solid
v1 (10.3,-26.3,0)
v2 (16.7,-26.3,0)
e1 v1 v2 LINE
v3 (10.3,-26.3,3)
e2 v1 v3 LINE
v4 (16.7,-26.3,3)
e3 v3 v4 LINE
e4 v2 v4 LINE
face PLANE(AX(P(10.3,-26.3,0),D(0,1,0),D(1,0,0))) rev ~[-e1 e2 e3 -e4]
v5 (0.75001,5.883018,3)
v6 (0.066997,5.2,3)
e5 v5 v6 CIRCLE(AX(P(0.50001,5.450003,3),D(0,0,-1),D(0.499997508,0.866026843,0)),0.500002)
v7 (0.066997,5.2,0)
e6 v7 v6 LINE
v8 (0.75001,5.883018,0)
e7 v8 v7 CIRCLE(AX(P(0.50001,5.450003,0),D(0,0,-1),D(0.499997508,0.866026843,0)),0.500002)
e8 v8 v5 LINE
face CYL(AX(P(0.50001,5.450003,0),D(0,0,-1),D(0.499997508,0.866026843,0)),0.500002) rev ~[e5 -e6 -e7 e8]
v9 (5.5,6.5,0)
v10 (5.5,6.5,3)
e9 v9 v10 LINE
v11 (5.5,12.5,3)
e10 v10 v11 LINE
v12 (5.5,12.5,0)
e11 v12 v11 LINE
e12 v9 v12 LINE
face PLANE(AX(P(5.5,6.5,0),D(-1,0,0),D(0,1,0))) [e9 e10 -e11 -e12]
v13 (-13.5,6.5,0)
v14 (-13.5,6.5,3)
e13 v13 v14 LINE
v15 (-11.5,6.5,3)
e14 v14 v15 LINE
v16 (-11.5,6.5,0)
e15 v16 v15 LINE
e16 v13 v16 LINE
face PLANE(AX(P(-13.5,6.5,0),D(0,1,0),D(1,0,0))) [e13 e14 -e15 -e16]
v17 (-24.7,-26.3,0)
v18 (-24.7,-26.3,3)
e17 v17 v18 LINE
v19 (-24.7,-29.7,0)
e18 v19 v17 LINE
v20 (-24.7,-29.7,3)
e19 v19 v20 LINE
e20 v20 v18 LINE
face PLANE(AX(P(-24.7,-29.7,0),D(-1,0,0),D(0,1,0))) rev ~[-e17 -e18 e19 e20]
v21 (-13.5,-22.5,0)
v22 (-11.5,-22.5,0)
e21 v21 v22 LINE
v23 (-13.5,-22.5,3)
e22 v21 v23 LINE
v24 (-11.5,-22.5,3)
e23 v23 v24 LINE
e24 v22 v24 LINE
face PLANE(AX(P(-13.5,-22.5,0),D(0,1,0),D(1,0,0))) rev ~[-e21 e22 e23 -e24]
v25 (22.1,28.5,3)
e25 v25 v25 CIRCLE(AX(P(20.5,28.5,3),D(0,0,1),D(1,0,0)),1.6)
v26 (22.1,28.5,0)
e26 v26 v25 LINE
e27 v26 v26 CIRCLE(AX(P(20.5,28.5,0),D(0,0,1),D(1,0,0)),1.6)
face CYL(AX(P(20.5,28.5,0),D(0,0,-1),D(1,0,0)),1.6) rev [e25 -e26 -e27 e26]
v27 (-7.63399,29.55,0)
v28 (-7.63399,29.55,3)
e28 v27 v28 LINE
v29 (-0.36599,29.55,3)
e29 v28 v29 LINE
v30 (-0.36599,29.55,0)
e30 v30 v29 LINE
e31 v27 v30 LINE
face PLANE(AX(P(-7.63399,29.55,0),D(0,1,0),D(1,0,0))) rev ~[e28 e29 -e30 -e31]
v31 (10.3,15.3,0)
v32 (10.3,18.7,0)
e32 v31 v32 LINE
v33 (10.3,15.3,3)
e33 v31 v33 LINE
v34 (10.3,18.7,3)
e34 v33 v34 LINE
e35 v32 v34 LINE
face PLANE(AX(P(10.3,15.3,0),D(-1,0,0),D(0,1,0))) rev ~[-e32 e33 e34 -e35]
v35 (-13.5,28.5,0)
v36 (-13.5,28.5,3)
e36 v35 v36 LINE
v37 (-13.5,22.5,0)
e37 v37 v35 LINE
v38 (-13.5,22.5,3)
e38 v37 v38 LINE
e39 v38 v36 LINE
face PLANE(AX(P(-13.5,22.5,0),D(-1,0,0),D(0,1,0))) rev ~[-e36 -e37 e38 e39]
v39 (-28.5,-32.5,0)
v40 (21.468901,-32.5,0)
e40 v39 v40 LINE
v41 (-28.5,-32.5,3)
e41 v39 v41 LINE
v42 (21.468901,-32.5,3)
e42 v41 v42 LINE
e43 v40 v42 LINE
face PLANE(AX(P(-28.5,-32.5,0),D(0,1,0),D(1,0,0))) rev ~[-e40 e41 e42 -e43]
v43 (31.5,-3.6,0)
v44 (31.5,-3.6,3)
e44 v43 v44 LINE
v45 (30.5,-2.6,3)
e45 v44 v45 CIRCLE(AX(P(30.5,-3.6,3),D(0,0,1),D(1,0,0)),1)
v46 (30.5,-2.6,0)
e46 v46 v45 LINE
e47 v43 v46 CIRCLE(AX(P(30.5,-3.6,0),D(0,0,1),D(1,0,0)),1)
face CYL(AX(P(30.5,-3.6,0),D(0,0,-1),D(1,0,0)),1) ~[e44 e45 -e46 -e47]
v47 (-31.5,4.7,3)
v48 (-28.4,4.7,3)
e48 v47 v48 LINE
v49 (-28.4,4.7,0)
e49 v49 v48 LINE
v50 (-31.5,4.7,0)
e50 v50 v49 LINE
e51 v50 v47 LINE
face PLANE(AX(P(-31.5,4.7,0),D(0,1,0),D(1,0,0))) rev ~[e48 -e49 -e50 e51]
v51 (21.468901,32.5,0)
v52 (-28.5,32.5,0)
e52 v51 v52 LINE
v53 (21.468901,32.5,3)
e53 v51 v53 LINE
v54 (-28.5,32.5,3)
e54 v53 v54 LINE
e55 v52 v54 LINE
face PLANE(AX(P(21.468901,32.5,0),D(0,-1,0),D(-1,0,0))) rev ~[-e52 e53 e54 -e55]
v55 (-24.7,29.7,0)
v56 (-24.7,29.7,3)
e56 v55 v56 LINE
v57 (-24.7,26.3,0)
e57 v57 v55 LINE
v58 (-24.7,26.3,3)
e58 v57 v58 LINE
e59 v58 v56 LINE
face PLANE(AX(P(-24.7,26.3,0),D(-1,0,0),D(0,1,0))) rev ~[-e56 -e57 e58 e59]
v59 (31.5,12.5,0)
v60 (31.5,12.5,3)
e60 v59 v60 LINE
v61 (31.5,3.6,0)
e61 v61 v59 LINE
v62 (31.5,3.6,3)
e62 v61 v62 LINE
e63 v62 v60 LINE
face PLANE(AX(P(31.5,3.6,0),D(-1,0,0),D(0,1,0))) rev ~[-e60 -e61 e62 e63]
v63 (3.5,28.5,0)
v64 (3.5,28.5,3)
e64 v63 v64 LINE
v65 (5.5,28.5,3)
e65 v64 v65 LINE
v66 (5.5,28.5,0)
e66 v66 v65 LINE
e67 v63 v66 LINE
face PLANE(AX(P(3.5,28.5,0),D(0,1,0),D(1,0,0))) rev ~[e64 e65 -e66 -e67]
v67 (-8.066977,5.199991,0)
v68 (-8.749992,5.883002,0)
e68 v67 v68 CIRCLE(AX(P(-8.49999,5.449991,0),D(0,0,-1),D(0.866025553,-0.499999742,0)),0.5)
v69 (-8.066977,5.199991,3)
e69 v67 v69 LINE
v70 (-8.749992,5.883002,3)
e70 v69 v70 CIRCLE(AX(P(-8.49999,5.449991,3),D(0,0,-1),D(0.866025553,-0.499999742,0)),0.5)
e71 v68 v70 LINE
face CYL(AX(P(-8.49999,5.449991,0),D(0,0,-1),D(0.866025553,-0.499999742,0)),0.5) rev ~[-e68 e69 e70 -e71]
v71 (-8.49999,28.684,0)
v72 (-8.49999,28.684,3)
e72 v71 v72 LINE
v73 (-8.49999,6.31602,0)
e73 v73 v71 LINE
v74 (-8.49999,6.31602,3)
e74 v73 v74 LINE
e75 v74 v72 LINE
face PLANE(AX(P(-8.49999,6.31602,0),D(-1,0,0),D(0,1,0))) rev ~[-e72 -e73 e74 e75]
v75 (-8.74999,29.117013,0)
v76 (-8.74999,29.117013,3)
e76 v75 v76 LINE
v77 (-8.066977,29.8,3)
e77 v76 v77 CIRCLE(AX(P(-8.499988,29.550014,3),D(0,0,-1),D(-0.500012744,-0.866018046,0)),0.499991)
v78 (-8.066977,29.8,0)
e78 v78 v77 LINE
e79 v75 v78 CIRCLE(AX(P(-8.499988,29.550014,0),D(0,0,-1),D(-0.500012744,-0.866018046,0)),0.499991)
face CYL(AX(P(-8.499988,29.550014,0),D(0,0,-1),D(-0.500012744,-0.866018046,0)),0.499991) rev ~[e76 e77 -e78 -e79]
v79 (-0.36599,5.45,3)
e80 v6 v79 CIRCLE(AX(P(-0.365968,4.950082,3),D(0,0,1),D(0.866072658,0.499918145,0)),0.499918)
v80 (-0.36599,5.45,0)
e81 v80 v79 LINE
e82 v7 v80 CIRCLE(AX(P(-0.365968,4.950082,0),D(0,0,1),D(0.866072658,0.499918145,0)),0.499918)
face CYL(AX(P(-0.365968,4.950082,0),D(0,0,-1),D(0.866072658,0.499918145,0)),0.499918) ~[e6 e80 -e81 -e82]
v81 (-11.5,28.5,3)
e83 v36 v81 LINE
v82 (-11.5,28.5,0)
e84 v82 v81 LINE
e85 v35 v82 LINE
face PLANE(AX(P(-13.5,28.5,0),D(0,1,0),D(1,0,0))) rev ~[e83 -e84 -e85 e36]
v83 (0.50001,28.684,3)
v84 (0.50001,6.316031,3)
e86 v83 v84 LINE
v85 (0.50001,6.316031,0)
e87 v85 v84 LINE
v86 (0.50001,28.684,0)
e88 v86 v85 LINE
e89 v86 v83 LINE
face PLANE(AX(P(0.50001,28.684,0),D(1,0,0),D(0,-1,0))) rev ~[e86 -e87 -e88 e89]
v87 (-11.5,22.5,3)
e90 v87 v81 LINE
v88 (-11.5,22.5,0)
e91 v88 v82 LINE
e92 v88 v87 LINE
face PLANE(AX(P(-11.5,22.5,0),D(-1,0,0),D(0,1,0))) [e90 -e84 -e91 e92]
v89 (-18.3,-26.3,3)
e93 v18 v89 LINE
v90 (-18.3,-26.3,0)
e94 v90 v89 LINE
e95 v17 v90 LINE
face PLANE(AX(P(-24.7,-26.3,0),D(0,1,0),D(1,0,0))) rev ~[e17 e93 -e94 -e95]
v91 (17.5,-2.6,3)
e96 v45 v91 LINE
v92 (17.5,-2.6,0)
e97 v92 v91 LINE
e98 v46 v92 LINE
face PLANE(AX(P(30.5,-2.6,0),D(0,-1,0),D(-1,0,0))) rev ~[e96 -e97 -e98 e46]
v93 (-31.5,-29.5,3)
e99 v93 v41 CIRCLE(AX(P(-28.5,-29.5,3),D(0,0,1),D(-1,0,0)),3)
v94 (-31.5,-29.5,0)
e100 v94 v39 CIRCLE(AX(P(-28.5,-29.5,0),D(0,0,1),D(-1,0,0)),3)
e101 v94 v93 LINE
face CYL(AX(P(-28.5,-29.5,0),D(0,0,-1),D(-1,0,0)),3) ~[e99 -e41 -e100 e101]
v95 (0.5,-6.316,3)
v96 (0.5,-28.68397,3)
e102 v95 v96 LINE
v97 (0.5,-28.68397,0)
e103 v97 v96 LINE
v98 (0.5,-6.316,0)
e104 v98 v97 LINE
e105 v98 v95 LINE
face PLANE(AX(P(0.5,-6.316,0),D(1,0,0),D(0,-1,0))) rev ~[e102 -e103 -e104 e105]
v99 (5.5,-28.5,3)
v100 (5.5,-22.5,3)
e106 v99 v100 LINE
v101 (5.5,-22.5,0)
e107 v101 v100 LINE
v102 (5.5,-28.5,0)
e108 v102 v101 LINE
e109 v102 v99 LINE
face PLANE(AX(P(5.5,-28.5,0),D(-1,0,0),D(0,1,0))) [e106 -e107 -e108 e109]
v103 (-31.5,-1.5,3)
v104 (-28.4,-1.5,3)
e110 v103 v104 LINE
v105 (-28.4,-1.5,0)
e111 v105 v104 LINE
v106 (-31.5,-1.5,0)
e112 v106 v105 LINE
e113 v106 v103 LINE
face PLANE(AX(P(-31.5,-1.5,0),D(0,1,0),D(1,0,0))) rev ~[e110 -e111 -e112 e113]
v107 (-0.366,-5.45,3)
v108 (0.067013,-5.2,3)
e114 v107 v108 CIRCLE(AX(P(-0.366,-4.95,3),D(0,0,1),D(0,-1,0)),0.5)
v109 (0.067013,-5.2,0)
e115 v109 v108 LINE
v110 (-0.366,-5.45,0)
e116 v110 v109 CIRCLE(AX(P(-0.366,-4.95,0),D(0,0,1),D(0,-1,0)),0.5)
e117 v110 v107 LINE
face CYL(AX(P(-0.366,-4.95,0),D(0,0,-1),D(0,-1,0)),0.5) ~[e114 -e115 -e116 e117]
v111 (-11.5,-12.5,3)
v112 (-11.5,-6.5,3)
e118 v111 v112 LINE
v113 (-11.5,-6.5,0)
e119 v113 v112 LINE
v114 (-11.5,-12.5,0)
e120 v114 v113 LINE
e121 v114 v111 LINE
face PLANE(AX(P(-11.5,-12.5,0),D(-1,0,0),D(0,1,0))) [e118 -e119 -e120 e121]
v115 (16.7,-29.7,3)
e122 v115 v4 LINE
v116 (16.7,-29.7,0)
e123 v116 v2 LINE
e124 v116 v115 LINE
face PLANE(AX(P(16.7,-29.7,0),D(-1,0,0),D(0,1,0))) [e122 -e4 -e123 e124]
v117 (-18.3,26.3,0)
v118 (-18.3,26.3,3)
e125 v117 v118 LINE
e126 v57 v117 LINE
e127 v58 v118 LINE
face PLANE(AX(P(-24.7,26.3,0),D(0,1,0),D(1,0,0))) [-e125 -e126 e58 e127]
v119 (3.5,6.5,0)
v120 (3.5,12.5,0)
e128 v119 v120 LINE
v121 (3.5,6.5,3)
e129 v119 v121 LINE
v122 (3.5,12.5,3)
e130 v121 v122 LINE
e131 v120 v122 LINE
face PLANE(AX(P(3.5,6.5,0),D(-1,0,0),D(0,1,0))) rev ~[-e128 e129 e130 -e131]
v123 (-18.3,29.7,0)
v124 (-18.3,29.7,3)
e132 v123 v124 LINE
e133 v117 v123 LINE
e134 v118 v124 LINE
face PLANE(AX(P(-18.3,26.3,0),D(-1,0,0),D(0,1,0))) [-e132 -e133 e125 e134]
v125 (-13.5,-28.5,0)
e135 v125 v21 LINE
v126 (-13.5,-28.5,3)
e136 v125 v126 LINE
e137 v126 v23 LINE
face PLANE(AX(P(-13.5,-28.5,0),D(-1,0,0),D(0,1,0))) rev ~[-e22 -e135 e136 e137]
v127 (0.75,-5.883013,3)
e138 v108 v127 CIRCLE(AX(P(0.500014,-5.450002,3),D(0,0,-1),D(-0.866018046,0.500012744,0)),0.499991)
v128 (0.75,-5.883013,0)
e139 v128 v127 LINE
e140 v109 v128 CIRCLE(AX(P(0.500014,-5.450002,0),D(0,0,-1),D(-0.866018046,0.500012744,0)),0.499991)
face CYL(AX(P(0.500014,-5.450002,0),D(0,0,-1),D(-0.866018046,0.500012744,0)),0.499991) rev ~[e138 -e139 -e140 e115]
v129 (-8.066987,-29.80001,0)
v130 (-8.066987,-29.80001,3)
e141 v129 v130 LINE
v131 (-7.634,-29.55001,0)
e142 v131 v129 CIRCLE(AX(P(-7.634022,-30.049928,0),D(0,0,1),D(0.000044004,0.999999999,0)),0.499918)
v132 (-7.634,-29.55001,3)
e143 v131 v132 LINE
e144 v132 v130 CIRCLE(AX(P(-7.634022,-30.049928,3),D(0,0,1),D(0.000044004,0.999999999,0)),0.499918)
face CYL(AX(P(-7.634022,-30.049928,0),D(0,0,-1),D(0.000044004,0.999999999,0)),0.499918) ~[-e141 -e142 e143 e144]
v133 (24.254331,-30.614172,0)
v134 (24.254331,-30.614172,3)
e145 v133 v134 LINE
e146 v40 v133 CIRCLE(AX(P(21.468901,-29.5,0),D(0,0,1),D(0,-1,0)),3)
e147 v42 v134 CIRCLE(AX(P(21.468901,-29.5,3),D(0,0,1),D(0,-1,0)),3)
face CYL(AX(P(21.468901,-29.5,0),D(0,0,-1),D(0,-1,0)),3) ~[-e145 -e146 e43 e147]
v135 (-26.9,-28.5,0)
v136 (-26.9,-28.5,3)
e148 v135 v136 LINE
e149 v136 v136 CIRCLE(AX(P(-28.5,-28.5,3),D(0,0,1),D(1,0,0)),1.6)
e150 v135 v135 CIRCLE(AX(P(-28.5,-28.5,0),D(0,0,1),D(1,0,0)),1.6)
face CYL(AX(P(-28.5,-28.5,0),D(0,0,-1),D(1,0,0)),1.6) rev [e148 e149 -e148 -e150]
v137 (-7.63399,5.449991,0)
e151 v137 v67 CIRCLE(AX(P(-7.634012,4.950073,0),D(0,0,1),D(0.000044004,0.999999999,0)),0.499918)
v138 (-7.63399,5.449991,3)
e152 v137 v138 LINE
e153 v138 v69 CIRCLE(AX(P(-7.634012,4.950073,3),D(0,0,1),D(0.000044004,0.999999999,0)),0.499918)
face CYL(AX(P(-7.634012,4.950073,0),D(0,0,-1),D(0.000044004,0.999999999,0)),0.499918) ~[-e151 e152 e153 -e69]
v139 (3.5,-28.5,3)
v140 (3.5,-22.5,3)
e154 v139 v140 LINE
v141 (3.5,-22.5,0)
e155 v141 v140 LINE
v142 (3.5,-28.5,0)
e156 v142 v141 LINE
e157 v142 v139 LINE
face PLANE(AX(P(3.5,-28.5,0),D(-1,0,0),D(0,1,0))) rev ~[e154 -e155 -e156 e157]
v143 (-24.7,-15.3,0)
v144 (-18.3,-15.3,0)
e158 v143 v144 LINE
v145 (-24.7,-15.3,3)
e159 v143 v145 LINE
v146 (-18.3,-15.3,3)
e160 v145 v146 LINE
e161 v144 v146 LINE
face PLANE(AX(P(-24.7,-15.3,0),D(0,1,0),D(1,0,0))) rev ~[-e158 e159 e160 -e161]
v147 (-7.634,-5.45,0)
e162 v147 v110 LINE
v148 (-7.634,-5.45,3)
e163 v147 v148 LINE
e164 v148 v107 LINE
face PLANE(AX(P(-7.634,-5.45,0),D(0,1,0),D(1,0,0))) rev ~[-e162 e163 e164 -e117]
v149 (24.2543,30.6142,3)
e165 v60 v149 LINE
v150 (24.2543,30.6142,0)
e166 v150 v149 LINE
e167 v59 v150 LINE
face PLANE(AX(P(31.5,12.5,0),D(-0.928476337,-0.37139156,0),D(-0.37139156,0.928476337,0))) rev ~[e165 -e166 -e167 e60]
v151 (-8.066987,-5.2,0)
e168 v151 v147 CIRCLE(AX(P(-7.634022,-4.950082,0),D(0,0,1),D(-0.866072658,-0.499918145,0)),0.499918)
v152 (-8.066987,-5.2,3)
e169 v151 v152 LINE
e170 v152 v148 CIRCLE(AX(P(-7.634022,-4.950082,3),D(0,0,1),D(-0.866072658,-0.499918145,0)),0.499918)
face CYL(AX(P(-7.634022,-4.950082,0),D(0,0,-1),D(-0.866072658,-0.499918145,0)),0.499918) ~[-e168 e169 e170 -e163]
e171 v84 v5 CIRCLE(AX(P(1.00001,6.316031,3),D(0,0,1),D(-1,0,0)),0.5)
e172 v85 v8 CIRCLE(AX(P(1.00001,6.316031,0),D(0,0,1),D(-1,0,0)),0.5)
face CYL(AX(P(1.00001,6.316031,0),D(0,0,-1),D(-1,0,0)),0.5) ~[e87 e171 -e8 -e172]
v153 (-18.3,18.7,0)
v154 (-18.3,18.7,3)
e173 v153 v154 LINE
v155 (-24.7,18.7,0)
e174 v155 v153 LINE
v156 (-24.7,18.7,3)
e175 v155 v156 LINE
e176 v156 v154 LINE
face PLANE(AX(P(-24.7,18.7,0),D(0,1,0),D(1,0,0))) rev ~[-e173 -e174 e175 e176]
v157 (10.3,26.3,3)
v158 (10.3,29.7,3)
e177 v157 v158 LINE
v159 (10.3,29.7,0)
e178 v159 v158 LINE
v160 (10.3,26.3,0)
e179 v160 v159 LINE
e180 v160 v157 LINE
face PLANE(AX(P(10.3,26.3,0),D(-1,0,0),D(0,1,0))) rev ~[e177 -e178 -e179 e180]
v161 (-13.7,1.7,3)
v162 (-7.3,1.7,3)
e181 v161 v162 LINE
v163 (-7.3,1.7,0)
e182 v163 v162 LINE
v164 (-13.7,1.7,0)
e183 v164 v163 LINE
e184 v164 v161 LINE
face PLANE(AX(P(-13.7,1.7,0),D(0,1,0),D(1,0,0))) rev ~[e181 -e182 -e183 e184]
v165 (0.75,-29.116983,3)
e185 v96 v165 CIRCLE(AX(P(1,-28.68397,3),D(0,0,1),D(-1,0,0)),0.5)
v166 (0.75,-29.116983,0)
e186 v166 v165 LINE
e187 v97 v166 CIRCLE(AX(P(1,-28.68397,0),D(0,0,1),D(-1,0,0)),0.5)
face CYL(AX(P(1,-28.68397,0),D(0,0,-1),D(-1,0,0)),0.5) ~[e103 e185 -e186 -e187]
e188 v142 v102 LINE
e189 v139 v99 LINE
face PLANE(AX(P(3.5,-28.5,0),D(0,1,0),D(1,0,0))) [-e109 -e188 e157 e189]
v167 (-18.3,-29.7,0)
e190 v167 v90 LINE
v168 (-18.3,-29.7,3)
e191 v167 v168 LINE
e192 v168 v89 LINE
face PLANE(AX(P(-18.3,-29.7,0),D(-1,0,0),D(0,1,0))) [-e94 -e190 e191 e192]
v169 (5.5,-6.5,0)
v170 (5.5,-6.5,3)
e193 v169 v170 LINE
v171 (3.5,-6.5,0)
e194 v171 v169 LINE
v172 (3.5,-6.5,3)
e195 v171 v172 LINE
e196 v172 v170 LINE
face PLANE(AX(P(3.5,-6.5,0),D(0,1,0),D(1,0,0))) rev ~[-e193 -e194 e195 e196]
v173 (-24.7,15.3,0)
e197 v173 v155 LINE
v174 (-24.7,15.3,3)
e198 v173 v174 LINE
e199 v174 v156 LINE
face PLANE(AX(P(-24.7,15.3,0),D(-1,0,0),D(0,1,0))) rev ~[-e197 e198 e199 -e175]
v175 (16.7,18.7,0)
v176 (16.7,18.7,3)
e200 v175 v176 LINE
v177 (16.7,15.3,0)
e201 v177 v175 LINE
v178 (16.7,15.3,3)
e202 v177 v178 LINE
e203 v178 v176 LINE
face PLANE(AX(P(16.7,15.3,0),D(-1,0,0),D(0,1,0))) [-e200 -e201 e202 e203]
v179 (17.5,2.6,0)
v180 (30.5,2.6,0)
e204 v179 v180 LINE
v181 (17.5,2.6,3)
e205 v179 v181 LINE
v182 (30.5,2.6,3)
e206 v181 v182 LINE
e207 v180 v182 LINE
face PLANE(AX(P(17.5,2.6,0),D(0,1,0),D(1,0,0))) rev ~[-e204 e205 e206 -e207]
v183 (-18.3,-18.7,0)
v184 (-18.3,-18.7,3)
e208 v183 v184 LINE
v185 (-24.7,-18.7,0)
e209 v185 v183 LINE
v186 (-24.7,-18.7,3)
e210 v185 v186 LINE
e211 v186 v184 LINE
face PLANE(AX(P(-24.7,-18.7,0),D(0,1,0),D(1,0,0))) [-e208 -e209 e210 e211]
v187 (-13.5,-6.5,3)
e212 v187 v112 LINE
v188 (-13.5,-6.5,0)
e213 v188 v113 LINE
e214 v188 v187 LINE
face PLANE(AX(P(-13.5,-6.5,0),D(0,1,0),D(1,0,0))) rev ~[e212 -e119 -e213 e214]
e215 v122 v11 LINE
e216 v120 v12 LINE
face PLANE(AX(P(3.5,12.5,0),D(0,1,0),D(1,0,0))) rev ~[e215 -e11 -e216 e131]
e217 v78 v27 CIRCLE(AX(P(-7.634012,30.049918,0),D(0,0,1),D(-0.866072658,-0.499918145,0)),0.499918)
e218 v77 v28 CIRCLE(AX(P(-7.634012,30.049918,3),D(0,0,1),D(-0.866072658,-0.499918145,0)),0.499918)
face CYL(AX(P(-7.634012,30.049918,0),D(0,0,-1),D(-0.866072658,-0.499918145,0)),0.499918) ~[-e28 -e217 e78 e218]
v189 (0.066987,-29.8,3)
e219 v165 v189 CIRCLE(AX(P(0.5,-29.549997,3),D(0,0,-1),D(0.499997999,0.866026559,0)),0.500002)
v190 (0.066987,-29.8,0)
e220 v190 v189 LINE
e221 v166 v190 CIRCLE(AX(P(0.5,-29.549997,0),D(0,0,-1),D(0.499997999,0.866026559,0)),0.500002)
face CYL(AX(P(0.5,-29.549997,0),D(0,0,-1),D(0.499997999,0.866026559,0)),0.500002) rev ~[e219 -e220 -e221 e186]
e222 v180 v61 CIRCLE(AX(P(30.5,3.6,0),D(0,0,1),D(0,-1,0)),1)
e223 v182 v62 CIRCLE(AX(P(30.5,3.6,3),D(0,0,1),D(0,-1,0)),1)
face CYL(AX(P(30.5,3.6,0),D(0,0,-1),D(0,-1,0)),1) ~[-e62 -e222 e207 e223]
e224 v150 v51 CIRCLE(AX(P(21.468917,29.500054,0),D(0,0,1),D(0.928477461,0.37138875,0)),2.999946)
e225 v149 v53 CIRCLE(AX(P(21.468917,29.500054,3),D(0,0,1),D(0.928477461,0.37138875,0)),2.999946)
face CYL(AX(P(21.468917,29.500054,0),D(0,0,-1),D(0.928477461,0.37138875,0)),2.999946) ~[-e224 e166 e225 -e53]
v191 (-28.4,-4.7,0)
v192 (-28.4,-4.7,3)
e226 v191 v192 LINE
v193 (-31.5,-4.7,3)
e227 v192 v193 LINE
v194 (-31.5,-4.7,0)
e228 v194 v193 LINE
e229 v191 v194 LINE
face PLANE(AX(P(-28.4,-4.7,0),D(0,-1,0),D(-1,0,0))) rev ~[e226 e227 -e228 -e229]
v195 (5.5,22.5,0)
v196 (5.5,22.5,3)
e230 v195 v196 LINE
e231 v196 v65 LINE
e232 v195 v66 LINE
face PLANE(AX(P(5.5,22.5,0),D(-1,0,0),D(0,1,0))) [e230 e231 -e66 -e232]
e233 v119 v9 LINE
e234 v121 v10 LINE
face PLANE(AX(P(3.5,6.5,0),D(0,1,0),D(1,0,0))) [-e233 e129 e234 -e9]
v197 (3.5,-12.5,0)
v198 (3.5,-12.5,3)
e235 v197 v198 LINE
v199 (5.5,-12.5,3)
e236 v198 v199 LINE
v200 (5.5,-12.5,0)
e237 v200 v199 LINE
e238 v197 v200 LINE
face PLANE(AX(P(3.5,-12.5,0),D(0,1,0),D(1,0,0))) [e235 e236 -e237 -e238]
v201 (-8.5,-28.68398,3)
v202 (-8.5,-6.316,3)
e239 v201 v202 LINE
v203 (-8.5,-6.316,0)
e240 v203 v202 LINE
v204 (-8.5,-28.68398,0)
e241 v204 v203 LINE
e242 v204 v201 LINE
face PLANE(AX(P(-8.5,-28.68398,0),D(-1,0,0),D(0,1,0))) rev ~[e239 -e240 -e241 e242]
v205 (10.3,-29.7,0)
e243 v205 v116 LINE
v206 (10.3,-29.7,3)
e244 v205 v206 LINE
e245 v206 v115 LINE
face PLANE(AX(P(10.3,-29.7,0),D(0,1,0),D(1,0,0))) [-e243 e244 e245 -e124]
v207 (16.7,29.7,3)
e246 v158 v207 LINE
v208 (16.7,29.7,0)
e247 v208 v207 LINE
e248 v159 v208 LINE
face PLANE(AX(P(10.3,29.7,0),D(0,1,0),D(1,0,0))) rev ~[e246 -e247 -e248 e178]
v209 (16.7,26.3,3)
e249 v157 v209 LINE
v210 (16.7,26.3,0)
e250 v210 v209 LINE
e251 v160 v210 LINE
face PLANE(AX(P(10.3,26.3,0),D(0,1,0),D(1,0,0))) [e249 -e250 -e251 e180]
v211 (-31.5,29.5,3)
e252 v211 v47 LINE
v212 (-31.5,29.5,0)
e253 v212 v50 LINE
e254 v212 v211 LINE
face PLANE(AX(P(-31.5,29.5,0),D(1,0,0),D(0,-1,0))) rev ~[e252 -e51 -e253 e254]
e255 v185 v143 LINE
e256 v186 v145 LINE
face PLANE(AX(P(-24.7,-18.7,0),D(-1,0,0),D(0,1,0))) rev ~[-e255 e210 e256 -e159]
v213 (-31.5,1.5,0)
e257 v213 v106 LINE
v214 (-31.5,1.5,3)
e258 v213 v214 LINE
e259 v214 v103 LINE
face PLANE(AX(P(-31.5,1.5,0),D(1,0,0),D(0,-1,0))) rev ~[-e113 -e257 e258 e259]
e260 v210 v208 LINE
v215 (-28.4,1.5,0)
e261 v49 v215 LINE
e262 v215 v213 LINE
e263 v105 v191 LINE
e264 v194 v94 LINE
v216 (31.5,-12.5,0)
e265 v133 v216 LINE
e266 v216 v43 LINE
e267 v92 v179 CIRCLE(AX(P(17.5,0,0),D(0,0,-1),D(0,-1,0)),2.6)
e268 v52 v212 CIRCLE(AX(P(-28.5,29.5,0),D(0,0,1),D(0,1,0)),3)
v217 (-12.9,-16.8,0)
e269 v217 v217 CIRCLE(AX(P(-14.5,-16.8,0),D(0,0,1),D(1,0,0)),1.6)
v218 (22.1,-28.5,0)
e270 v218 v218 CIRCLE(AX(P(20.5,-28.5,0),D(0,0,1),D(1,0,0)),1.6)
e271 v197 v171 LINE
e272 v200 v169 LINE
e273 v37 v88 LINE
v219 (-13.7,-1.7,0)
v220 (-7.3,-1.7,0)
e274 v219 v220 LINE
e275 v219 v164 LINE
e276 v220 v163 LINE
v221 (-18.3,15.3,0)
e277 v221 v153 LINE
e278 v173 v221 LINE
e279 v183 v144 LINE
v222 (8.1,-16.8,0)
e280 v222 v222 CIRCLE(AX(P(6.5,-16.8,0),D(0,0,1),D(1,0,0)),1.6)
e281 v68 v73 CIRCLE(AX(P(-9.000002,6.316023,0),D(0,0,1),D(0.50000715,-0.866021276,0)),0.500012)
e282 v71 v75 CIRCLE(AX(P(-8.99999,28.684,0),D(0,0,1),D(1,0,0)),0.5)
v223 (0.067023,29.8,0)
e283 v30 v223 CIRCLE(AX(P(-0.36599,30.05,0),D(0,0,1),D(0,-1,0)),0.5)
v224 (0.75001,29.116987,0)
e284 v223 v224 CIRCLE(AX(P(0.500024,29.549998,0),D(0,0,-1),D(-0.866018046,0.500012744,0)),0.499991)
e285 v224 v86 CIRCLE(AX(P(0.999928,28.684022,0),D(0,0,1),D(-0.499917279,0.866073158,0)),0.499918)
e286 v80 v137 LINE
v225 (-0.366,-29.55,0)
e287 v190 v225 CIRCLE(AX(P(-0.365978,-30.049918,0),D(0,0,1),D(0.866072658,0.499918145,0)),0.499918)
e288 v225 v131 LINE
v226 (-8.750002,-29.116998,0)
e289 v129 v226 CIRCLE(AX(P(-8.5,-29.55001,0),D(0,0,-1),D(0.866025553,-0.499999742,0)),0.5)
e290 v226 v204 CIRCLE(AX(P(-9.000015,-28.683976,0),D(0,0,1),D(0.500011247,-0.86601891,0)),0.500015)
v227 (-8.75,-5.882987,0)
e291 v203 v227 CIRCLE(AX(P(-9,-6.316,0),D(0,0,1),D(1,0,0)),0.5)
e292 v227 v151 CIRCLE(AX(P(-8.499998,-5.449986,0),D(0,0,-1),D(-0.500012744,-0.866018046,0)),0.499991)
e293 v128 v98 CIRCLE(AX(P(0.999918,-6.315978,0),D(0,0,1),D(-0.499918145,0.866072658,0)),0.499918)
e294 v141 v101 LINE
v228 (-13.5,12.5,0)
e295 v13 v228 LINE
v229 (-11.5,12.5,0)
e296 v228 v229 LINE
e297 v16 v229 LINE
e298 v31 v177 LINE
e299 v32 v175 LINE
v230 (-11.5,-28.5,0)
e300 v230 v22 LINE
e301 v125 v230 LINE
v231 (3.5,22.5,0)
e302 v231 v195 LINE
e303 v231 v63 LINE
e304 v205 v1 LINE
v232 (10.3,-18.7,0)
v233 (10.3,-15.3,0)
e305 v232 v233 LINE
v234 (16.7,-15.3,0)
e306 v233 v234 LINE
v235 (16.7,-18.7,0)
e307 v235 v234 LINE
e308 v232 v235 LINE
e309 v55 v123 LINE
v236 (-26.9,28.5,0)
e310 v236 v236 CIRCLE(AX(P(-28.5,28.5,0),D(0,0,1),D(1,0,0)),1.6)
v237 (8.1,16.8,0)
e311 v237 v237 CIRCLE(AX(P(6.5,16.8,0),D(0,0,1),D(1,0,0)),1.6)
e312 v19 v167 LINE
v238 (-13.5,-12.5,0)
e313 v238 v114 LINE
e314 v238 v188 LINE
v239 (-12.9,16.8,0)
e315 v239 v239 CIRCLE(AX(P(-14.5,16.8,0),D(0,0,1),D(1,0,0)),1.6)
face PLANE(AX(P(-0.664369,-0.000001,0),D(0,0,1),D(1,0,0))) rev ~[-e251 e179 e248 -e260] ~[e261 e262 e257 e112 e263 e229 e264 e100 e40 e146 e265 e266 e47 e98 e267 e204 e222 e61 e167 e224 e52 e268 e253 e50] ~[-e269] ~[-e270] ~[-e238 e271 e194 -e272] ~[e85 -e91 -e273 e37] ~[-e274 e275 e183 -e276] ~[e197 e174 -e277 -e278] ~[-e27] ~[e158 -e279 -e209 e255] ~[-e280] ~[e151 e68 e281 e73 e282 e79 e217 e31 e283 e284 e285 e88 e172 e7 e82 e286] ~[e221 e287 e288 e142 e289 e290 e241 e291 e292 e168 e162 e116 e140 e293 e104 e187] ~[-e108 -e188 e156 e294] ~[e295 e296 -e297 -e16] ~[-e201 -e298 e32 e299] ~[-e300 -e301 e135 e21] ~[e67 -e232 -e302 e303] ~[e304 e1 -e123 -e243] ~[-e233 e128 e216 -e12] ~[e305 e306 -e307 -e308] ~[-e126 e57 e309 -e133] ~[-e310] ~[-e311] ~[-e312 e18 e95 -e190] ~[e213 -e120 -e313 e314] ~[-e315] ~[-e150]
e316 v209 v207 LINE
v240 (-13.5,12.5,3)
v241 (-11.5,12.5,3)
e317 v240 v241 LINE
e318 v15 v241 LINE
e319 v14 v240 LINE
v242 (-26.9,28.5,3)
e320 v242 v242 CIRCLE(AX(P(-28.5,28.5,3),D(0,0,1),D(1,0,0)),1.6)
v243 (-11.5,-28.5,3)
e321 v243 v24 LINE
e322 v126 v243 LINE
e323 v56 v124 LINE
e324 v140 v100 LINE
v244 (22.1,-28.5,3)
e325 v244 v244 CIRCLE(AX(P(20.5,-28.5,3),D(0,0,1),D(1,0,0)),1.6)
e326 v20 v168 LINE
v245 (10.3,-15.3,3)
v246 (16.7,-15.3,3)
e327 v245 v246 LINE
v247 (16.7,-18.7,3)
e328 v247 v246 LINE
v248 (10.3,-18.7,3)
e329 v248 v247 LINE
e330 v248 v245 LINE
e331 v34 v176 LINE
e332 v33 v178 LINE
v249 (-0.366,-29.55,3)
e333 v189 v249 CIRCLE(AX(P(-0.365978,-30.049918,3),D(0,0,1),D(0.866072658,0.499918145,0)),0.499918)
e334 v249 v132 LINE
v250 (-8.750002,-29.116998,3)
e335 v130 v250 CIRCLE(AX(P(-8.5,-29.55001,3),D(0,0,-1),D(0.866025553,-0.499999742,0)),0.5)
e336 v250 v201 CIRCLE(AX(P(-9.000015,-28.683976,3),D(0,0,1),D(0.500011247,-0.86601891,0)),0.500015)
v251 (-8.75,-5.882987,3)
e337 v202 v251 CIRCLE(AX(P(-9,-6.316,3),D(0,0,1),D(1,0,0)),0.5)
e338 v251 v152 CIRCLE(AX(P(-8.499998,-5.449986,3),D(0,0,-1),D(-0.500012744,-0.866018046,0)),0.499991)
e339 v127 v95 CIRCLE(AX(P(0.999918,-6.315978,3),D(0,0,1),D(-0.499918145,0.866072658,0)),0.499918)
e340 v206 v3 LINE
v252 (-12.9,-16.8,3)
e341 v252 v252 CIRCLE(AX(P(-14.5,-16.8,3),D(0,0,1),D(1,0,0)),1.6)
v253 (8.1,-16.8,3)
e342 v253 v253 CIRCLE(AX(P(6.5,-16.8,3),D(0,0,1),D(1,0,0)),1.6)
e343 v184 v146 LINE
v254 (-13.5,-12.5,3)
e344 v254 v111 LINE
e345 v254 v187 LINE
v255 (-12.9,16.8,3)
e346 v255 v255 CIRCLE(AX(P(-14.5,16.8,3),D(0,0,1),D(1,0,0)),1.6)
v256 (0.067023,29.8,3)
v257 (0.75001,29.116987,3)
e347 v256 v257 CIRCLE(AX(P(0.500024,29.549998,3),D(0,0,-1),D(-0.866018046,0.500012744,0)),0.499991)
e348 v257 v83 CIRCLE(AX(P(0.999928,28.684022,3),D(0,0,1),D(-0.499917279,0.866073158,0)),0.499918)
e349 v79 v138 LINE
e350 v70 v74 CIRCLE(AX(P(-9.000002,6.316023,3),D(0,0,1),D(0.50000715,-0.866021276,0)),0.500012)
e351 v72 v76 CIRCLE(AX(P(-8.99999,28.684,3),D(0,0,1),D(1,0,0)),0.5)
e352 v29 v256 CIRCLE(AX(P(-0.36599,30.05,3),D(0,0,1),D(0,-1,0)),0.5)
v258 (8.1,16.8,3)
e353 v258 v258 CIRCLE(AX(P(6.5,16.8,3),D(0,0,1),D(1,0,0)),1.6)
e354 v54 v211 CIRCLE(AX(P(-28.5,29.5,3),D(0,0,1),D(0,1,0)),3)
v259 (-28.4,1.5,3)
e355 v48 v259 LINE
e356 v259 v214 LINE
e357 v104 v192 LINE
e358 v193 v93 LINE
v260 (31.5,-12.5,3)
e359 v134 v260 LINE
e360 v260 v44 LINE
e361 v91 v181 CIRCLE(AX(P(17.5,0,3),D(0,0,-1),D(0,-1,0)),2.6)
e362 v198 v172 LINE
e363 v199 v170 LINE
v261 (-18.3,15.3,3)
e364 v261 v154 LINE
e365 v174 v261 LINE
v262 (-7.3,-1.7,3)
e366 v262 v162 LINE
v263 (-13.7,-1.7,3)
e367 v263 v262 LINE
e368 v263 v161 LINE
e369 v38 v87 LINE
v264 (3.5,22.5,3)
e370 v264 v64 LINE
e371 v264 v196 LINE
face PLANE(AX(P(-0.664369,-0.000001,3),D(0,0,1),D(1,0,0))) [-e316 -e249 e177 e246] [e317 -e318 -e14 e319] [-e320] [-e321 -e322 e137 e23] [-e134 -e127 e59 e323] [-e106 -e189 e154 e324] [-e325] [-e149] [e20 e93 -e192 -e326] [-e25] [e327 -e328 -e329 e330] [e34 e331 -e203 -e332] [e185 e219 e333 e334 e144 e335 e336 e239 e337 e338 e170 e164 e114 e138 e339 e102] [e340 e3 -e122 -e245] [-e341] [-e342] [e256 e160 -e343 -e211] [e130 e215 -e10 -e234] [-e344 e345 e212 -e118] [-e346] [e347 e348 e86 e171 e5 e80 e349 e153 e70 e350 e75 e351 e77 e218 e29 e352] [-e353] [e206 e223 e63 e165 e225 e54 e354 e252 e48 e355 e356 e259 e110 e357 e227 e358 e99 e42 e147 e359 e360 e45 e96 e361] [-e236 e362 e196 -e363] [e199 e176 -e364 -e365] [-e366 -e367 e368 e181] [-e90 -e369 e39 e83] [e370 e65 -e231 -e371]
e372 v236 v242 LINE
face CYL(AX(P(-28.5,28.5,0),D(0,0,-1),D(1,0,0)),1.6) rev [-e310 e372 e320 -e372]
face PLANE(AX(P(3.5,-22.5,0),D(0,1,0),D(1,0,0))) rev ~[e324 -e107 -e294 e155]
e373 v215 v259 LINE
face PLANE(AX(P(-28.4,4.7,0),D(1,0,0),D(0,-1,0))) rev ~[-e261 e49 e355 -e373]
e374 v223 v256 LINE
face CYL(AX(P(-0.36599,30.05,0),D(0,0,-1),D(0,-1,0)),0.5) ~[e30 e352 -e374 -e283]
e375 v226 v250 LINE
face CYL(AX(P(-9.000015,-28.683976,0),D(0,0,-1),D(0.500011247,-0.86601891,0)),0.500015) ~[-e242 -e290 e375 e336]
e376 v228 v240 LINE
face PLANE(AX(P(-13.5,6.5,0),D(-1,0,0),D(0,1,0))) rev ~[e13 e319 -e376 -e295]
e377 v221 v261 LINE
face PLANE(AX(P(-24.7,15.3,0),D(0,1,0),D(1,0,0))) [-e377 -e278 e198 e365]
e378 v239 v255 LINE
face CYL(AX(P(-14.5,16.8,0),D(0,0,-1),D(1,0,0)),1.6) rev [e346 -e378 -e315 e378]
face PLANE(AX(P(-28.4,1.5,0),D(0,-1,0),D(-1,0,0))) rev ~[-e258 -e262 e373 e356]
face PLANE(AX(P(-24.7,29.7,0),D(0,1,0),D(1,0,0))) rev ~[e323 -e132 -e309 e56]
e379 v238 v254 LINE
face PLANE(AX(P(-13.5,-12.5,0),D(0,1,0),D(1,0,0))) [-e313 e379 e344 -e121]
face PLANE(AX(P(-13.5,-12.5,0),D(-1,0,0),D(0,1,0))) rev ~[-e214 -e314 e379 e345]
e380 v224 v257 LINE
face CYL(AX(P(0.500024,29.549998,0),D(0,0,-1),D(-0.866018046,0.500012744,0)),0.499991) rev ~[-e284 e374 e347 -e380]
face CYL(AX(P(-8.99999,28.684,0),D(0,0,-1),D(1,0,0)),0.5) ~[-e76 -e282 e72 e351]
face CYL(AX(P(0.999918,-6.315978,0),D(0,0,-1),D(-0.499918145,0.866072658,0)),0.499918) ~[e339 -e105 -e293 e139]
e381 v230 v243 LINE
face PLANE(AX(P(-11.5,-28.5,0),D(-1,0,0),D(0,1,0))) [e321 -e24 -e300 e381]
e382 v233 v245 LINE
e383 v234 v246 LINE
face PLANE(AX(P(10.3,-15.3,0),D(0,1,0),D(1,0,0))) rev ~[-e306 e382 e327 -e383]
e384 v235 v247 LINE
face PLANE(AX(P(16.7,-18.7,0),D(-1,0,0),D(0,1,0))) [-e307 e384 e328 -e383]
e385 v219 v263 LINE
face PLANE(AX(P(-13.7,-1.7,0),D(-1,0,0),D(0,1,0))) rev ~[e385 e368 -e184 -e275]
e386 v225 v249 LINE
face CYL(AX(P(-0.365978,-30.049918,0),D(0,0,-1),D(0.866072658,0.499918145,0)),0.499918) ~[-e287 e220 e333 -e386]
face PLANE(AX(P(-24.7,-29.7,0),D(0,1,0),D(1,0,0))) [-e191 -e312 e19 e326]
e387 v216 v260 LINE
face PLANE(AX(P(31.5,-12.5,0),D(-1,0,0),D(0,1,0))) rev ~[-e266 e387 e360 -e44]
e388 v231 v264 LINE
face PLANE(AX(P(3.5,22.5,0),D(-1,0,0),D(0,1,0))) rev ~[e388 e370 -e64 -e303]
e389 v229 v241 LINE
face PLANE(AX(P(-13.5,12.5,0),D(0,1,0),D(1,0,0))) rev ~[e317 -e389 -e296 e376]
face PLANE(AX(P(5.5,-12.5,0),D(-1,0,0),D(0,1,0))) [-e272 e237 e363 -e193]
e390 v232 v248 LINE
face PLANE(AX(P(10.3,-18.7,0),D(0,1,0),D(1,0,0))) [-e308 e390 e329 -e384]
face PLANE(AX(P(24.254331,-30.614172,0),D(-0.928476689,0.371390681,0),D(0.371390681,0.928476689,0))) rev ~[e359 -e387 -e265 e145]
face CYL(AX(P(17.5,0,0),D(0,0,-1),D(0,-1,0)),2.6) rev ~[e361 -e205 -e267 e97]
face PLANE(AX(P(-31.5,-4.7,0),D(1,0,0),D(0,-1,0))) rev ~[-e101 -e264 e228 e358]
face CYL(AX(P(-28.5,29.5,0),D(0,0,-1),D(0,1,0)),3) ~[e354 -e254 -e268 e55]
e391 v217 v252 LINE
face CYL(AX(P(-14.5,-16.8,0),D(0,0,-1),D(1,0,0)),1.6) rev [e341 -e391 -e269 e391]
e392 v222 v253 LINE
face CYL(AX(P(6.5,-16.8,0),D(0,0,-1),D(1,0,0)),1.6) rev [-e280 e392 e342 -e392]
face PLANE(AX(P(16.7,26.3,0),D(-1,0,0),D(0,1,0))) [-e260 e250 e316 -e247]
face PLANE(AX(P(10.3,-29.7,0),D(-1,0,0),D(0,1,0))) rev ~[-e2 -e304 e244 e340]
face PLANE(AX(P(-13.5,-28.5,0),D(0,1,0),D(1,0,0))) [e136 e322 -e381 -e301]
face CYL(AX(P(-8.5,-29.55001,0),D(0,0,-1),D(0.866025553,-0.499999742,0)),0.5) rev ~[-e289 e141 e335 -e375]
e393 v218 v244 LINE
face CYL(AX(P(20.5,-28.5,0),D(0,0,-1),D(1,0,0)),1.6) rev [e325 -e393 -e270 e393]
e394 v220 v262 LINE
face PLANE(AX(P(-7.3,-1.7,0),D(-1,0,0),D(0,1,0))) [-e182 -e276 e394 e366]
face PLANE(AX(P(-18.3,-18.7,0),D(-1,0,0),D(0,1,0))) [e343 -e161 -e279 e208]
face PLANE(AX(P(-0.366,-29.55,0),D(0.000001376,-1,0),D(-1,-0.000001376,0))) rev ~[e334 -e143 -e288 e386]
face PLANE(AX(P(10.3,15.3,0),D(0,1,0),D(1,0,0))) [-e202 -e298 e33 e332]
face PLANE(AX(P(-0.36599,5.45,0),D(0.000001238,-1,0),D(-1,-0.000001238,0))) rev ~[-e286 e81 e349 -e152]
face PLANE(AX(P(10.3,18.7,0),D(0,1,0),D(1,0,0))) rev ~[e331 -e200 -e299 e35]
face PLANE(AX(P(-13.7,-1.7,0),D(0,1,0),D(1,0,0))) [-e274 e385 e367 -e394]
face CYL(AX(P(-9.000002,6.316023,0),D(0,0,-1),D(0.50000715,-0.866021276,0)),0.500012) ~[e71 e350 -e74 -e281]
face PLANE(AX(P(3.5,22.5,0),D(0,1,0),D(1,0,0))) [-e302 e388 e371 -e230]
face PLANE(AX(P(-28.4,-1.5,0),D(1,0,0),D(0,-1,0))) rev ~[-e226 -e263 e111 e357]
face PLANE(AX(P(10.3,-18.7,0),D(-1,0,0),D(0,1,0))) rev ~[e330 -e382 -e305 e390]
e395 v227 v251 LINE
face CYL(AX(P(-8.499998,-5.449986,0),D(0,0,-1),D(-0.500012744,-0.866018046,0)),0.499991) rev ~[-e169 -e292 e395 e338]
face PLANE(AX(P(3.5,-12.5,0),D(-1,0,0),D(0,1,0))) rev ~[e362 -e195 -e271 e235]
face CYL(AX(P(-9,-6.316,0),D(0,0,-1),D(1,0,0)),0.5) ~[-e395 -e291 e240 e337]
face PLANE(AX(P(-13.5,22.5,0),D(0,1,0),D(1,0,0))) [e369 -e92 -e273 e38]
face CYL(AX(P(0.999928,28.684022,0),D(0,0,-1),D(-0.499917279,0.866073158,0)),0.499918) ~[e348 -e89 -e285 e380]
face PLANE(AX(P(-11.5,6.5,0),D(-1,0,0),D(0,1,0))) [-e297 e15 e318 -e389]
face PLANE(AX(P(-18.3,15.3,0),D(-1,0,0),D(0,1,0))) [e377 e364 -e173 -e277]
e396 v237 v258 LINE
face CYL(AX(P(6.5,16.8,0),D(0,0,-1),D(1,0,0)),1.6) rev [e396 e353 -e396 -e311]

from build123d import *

# Parameters (mm, degrees)
F0_R     = 1.6
F0_W     = 6.4
F0_H     = 3.4
F0_W_2   = 2
F0_H_2   = 6
F1_DEPTH = 3


# Not quite as in the source:
# - ends of sketch curves that miss each other by under 0.0002 mm in the source are joined


with BuildPart() as f1:
    # F0 (on Top) → F1 (new body)
    with BuildSketch(Plane.XY):
        with BuildLine():
            Line((-31.5, 1.5), (-31.5, -1.5))
            Line((-31.5, -1.5), (-28.4, -1.5))
            Line((-28.4, -1.5), (-28.4, -4.7))
            Line((-28.4, -4.7), (-31.5, -4.7))
            Line((-31.5, -4.7), (-31.5, -29.5))
            ThreePointArc((-31.5, -29.5), (-30.6213203436, -31.6213203436), (-28.5, -32.5))
            Line((-28.5, -32.5), (21.468901, -32.5))
            ThreePointArc((21.468901, -32.5), (23.1507874279, -31.9842016914), (24.2543310727, -30.6141720291))
            Line((24.2543310727, -30.6141720291), (31.5, -12.5))
            Line((31.5, -12.5), (31.5, -3.6))
            ThreePointArc((31.5, -3.6), (31.2071067812, -2.8928932188), (30.5, -2.6))
            Line((30.5, -2.6), (17.5, -2.6))
            ThreePointArc((17.5, -2.6), (14.9, 0), (17.5, 2.6))
            Line((17.5, 2.6), (30.5, 2.6))
            ThreePointArc((30.5, 2.6), (31.2071067812, 2.8928932188), (31.5, 3.6))
            Line((31.5, 3.6), (31.5, 12.5))
            Line((31.5, 12.5), (24.2543, 30.6142))
            ThreePointArc((24.2543, 30.6142), (23.1507874279, 31.9842016914), (21.468901, 32.5))
            Line((21.468901, 32.5), (-28.5, 32.5))
            ThreePointArc((-28.5, 32.5), (-30.6213203436, 31.6213203436), (-31.5, 29.5))
            Line((-31.5, 29.5), (-31.5, 4.7))
            Line((-31.5, 4.7), (-28.4, 4.7))
            Line((-28.4, 4.7), (-28.4, 1.5))
            Line((-28.4, 1.5), (-31.5, 1.5))
        make_face()
        with Locations((-28.5, -28.5)):
            Circle(F0_R, mode=Mode.SUBTRACT)
        with Locations((-21.5, -28)):
            Rectangle(F0_W, F0_H, mode=Mode.SUBTRACT)
        with Locations((-21.5, -17)):
            Rectangle(F0_W, F0_H, mode=Mode.SUBTRACT)
        with Locations((-12.5, -25.5)):
            Rectangle(F0_W_2, F0_H_2, mode=Mode.SUBTRACT)
        with Locations((-14.5, -16.8)):
            Circle(F0_R, mode=Mode.SUBTRACT)
        with BuildLine():
            ThreePointArc((-8.0669872236, -29.8000098709), (-8.8535526014, -29.9035641797), (-8.7500018039, -29.1169983396))
            ThreePointArc((-8.7500018039, -29.1169983396), (-8.5669873354, -28.9339800645), (-8.5, -28.68398))
            Line((-8.5, -28.68398), (-8.5, -6.316))
            ThreePointArc((-8.5, -6.316), (-8.5669873354, -6.0659999355), (-8.7500001291, -5.8829872236))
            ThreePointArc((-8.7500001291, -5.8829872236), (-8.8535533906, -5.0964466094), (-8.0669872236, -5.2000001291))
            ThreePointArc((-8.0669872236, -5.2000001291), (-7.8840000645, -5.3830126646), (-7.634, -5.45))
            Line((-7.634, -5.45), (-0.366, -5.45))
            ThreePointArc((-0.366, -5.45), (-0.1159999355, -5.3830126646), (0.0670127764, -5.1999998709))
            ThreePointArc((0.0670127764, -5.1999998709), (0.8535541797, -5.0964473986), (0.7499998709, -5.8830127764))
            ThreePointArc((0.7499998709, -5.8830127764), (0.5669873354, -6.0659999355), (0.5, -6.316))
            Line((0.5, -6.316), (0.5, -28.68397))
            ThreePointArc((0.5, -28.68397), (0.5669873354, -28.9339700645), (0.7500001291, -29.1169827764))
            ThreePointArc((0.7500001291, -29.1169827764), (0.8535533906, -29.9035533906), (0.0669872236, -29.7999998709))
            ThreePointArc((0.0669872236, -29.7999998709), (-0.1159999355, -29.6169873354), (-0.366, -29.55))
            Line((-0.366, -29.55), (-7.634, -29.55001))
            ThreePointArc((-7.634, -29.55001), (-7.8840000645, -29.6169973354), (-8.0669872236, -29.8000098709))
        make_face(mode=Mode.SUBTRACT)
        with Locations((-12.5, -9.5)):
            Rectangle(F0_W_2, F0_H_2, mode=Mode.SUBTRACT)
        with Locations((4.5, -25.5)):
            Rectangle(F0_W_2, F0_H_2, mode=Mode.SUBTRACT)
        with Locations((13.5, -28)):
            Rectangle(F0_W, F0_H, mode=Mode.SUBTRACT)
        with Locations((6.5, -16.8)):
            Circle(F0_R, mode=Mode.SUBTRACT)
        with Locations((13.5, -17)):
            Rectangle(F0_W, F0_H, mode=Mode.SUBTRACT)
        with Locations((20.5, -28.5)):
            Circle(F0_R, mode=Mode.SUBTRACT)
        with Locations((4.5, -9.5)):
            Rectangle(F0_W_2, F0_H_2, mode=Mode.SUBTRACT)
        with Locations((-10.5, 0)):
            Rectangle(F0_W, F0_H, mode=Mode.SUBTRACT)
        with Locations((-12.5, 9.5)):
            Rectangle(F0_W_2, F0_H_2, mode=Mode.SUBTRACT)
        with Locations((-21.5, 17)):
            Rectangle(F0_W, F0_H, mode=Mode.SUBTRACT)
        with Locations((-28.5, 28.5)):
            Circle(F0_R, mode=Mode.SUBTRACT)
        with Locations((-21.5, 28)):
            Rectangle(F0_W, F0_H, mode=Mode.SUBTRACT)
        with Locations((-14.5, 16.8)):
            Circle(F0_R, mode=Mode.SUBTRACT)
        with BuildLine():
            ThreePointArc((-8.0669772236, 5.1999911291), (-8.8535424247, 5.0964366435), (-8.7499922369, 5.8830024104))
            ThreePointArc((-8.7499922369, 5.8830024104), (-8.5669772104, 6.066020152), (-8.49999, 6.31602))
            Line((-8.49999, 6.31602), (-8.49999, 28.684))
            ThreePointArc((-8.49999, 28.684), (-8.5669773354, 28.9340000645), (-8.7499901291, 29.1170127764))
            ThreePointArc((-8.7499901291, 29.1170127764), (-8.8535432138, 29.9035535674), (-8.0669772236, 29.7999998709))
            ThreePointArc((-8.0669772236, 29.7999998709), (-7.8839900645, 29.6169873354), (-7.63399, 29.55))
            Line((-7.63399, 29.55), (-0.36599, 29.55))
            ThreePointArc((-0.36599, 29.55), (-0.1159899355, 29.6169873354), (0.0670227764, 29.8000001291))
            ThreePointArc((0.0670227764, 29.8000001291), (0.853564003, 29.9035527782), (0.7500103039, 29.1169874736))
            ThreePointArc((0.7500103039, 29.1169874736), (0.5669973354, 28.9340000645), (0.50001, 28.684))
            Line((0.50001, 28.684), (0.50001, 6.316031))
            ThreePointArc((0.50001, 6.316031), (0.5669973354, 6.0660309355), (0.7500101291, 5.8830182236))
            ThreePointArc((0.7500101291, 5.8830182236), (0.8535633906, 5.0964466094), (0.0669972236, 5.2000001291))
            ThreePointArc((0.0669972236, 5.2000001291), (-0.1159899355, 5.3830126646), (-0.36599, 5.45))
            Line((-0.36599, 5.45), (-7.63399, 5.449991))
            ThreePointArc((-7.63399, 5.449991), (-7.8839900645, 5.3830036646), (-8.0669772236, 5.1999911291))
        make_face(mode=Mode.SUBTRACT)
        with Locations((-12.5, 25.5)):
            Rectangle(F0_W_2, F0_H_2, mode=Mode.SUBTRACT)
        with Locations((4.5, 9.5)):
            Rectangle(F0_W_2, F0_H_2, mode=Mode.SUBTRACT)
        with Locations((6.5, 16.8)):
            Circle(F0_R, mode=Mode.SUBTRACT)
        with Locations((13.5, 17)):
            Rectangle(F0_W, F0_H, mode=Mode.SUBTRACT)
        with Locations((4.5, 25.5)):
            Rectangle(F0_W_2, F0_H_2, mode=Mode.SUBTRACT)
        with Locations((13.5, 28)):
            Rectangle(F0_W, F0_H, mode=Mode.SUBTRACT)
        with Locations((20.5, 28.5)):
            Circle(F0_R, mode=Mode.SUBTRACT)
    extrude(amount=F1_DEPTH)


solid = f1.part
